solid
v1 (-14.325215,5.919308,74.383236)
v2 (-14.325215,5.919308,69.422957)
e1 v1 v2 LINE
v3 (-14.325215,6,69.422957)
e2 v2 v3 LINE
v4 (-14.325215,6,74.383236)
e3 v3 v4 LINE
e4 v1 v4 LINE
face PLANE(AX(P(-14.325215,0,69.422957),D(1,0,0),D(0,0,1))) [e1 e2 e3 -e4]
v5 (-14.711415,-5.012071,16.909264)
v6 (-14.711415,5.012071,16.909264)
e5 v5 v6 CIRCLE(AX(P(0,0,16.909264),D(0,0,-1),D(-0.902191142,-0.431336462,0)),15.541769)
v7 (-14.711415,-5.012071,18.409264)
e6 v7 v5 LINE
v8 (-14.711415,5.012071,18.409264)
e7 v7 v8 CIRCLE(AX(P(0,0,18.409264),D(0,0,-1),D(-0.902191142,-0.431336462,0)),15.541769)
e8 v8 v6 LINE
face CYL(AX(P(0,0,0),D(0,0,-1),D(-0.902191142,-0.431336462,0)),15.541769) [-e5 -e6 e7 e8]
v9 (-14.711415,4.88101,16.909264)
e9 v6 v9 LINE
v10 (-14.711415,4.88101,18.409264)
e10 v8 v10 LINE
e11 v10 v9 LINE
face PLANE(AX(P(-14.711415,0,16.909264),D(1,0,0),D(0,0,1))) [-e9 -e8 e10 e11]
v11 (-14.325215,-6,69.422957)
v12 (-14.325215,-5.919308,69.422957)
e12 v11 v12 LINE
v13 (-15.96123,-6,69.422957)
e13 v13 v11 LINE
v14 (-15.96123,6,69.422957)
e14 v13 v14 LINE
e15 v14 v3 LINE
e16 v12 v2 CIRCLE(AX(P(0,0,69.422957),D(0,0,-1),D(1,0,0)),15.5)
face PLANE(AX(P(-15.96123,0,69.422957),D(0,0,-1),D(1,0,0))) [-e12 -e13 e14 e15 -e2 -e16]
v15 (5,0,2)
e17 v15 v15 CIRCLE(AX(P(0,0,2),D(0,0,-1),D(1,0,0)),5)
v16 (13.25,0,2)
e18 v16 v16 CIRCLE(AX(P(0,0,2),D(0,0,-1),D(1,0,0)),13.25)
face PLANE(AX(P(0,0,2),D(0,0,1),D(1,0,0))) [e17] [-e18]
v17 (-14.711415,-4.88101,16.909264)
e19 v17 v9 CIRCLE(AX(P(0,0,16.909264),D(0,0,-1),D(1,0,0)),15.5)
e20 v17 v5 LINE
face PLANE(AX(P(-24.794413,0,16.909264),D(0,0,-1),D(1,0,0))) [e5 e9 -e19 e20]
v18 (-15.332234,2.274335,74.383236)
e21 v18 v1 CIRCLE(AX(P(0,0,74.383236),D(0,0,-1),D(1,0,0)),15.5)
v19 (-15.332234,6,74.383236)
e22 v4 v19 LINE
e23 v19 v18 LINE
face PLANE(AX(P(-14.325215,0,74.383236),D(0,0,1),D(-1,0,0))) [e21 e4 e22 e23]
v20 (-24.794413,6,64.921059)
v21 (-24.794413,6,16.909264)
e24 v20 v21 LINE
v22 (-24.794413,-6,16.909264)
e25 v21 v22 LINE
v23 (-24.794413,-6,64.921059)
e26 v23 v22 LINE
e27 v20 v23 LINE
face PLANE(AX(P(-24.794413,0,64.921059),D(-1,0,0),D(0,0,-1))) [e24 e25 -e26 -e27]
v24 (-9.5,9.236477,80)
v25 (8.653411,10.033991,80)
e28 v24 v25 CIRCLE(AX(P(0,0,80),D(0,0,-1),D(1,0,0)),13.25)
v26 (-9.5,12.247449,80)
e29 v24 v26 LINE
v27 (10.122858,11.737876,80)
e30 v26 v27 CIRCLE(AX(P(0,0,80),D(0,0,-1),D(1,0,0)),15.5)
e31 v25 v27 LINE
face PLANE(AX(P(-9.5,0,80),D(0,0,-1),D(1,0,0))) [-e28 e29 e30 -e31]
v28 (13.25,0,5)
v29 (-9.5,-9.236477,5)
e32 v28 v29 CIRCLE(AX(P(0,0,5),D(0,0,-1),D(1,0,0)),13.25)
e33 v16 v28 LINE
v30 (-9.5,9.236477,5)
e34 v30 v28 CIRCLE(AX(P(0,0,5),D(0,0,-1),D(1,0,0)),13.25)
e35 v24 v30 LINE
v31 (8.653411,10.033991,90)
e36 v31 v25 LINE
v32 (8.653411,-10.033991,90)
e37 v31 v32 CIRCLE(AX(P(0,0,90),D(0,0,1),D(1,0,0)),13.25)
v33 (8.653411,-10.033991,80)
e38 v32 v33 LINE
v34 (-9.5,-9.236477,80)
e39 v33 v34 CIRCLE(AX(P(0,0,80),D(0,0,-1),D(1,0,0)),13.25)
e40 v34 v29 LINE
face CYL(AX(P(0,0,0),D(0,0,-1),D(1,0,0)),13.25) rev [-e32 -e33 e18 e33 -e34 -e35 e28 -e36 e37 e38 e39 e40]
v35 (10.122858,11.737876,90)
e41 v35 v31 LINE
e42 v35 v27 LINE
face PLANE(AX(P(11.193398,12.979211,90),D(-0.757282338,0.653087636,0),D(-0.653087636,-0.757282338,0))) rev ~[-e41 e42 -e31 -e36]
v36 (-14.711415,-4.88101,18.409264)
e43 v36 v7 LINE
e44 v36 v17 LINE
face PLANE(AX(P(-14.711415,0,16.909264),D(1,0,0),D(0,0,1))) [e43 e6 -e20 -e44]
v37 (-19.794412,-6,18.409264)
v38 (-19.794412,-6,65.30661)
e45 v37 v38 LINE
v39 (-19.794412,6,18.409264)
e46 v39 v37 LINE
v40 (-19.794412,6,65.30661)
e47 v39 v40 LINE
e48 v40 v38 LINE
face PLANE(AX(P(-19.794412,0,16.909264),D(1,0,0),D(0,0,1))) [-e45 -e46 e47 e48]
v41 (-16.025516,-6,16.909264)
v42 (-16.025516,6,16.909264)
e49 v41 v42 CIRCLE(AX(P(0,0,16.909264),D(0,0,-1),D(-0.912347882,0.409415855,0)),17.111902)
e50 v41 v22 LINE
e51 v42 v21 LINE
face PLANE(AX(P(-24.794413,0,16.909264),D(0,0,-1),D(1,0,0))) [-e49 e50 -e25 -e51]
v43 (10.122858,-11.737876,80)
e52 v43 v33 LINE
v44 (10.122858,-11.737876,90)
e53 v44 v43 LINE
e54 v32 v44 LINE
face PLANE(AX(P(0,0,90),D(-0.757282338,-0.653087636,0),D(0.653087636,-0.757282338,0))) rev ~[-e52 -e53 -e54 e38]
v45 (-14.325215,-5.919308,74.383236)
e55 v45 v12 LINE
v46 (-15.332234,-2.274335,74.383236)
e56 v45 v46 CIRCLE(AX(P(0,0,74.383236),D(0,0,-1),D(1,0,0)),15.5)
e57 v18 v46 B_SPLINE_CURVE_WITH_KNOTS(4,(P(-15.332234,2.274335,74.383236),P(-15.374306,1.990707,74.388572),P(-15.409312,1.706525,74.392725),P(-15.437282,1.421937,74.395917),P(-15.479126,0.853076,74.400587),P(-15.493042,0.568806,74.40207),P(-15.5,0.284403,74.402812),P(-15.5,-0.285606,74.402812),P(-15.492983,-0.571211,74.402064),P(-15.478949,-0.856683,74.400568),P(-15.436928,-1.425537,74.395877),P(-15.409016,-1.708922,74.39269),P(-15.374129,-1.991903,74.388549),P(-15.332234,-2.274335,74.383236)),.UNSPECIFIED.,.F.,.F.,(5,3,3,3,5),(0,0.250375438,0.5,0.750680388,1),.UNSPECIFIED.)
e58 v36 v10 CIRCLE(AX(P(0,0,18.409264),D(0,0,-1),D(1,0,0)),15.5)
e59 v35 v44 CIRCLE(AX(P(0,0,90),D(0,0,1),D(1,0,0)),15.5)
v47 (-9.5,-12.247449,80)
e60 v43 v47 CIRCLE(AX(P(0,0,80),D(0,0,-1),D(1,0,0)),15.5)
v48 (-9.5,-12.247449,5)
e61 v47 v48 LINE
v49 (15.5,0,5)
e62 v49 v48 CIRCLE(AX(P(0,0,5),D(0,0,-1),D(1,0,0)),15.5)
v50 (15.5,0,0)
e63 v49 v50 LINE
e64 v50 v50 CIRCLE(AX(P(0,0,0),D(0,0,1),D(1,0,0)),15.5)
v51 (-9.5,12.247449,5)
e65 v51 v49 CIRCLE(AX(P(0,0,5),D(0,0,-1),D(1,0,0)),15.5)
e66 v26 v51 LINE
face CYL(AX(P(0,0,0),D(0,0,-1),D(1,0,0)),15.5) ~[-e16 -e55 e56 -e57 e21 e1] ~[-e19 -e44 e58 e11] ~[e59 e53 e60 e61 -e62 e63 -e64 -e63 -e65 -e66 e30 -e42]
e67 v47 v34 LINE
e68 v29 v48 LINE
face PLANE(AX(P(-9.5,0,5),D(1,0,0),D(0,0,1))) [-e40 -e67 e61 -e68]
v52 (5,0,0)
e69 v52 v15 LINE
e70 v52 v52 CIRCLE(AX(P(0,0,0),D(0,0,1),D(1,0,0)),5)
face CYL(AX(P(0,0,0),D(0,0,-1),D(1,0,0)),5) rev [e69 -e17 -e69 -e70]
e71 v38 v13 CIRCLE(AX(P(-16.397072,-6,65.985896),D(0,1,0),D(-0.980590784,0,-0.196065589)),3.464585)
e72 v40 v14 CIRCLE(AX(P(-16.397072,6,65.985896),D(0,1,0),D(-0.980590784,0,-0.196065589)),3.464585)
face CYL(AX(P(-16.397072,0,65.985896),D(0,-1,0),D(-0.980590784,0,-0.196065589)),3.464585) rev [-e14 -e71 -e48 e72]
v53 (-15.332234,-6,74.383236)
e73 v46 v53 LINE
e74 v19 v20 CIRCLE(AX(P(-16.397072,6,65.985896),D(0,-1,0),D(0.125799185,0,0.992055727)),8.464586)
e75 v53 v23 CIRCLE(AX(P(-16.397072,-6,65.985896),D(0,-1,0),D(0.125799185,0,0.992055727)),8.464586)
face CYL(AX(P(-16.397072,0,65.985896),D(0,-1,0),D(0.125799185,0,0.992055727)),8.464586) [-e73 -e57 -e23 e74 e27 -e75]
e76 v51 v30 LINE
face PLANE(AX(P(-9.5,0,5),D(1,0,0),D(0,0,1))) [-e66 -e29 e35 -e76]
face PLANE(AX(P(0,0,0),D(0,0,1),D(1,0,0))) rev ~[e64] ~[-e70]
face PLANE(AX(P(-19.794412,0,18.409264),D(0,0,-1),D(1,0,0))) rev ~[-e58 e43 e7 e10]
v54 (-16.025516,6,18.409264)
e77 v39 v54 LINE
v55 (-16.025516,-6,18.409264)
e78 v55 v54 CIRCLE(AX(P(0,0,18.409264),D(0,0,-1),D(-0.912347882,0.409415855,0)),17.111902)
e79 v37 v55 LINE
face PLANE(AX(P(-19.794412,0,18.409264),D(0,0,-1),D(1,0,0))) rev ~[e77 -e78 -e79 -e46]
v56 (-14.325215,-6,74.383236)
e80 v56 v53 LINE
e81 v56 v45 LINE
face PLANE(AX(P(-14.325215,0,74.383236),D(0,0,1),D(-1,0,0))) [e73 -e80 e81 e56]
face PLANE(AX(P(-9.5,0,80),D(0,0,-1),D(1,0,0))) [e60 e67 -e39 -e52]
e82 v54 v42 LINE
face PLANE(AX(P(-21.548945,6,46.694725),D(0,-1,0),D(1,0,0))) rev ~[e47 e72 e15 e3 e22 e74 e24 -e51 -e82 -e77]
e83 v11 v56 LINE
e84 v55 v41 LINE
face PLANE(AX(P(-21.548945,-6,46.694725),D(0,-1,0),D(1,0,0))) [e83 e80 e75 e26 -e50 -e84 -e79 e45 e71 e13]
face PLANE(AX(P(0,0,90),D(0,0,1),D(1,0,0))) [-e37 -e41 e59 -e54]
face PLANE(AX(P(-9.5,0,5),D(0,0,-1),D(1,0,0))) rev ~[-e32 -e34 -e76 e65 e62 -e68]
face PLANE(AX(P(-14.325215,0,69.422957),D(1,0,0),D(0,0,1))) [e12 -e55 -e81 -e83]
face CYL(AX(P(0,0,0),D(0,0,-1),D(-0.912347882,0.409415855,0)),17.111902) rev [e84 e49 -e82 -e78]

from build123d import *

# Parameters (mm, degrees)
F0_R      = 15.5
F0_R_2    = 13.25
F1_DEPTH  = 90
F2_R      = 15.5
F3_DEPTH  = 2
F4_R      = 5
F5_DEPTH  = 90.001
F6_W      = 25
F6_H      = 75
F7_DEPTH  = 30
F9_DEPTH  = 6
F10_W     = 5.0829965621
F10_H     = 1.5
F11_DEPTH = 6
F13_DEPTH = 25
F15_DEPTH = 25
F16_DEPTH = 25


# Not quite as in the source:
# - a feature names something its author has since deleted; it is built from what else it names


with BuildPart() as f1:
    # F0 (on Top) → F1 (new body)
    with BuildSketch(Plane.XY):
        Circle(F0_R)
        Circle(F0_R_2, mode=Mode.SUBTRACT)
    extrude(amount=F1_DEPTH)

    # F2 (on Top) → F3 (join)
    with BuildSketch(Plane.XY):
        Circle(F2_R)
    extrude(amount=F3_DEPTH)

    # F4 (on Top) → F5 (cut, through all)
    with BuildSketch(Plane.XY):
        Circle(F4_R)
    extrude(amount=F5_DEPTH, mode=Mode.SUBTRACT)

    # F6 (on Front) → F7 (cut, symmetric)
    with BuildSketch(Plane.XZ):
        with Locations((3, 42.5)):
            Rectangle(F6_W, F6_H)
    extrude(amount=F7_DEPTH, both=True, mode=Mode.SUBTRACT)

    # F8 (on Front) → F9 (join, symmetric)
    with BuildSketch(Plane.XZ):
        with BuildLine():
            Line((-14.3252154812, 74.3832364678), (-15.3322340921, 74.3832364678))
            ThreePointArc((-15.3322340921, 74.3832364678), (-22.3824376382, 71.9712620232), (-24.7944127768, 64.9210587144))
            Line((-24.7944127768, 64.9210587144), (-24.7944127768, 16.9092640281))
            Line((-24.7944127768, 16.9092640281), (-19.7944119573, 16.9092640281))
            Line((-19.7944119573, 16.9092640281), (-19.7944119573, 65.3066100025))
            ThreePointArc((-19.7944119573, 65.3066100025), (-18.9325593375, 68.3469659349), (-15.9612301203, 69.4229570209))
            Line((-15.9612301203, 69.4229570209), (-14.3252154812, 69.4229570209))
            Line((-14.3252154812, 69.4229570209), (-14.3252154812, 74.3832364678))
        make_face()
    extrude(amount=F9_DEPTH, both=True)

    # F10 (on Front) → F11 (join, symmetric)
    with BuildSketch(Plane.XZ):
        with BuildLine():
            Line((-14.3252154812, 74.3832364678), (-15.3322340921, 74.3832364678))
            ThreePointArc((-15.3322340921, 74.3832364678), (-22.3824376382, 71.9712620232), (-24.7944127768, 64.9210587144))
            Line((-24.7944127768, 64.9210587144), (-24.7944127768, 16.9092640281))
            Line((-24.7944127768, 16.9092640281), (-19.7944119573, 16.9092640281))
            Line((-19.7944119573, 16.9092640281), (-19.7944119573, 18.4092640281))
            Line((-19.7944119573, 18.4092640281), (-19.7944119573, 65.3066100025))
            ThreePointArc((-19.7944119573, 65.3066100025), (-18.9325593375, 68.3469659349), (-15.9612301203, 69.4229570209))
            Line((-15.9612301203, 69.4229570209), (-14.3252154812, 69.4229570209))
            Line((-14.3252154812, 69.4229570209), (-14.3252154812, 74.3832364678))
        make_face()
        with Locations((-17.2529136762, 17.6592640281)):
            Rectangle(F10_W, F10_H)
    extrude(amount=F11_DEPTH, both=True)

    # F12 (on Top) → F13 (cut)
    with BuildSketch(Plane.XY):
        with BuildLine():
            Line((-13.8731463173, 7.0058838464), (-15.6120072238, 7.0058838464))
            ThreePointArc((-15.6120072238, 7.0058838464), (-17.1111072391, 0.1648850375), (-15.74411501, -6.7037318396))
            Line((-15.74411501, -6.7037318396), (-14.0216467162, -6.7037318396))
            ThreePointArc((-14.0216467162, -6.7037318396), (-15.5408577678, 0.1683361248), (-13.8731463173, 7.0058838464))
        make_face()
    extrude(amount=F13_DEPTH, mode=Mode.SUBTRACT)

    # F14 (on face) → F15 (cut)
    with BuildSketch(Plane.XY.offset(90)):
        with BuildLine():
            Line((11.193397513, 12.9792110231), (0, 0))
            Line((0, 0), (11.193397513, -12.9792110231))
            ThreePointArc((11.193397513, -12.9792110231), (17.1391967918, 0), (11.193397513, 12.9792110231))
        make_face()
    extrude(amount=-F15_DEPTH, mode=Mode.SUBTRACT)

    # F14 (on face) → F16 (cut)
    with BuildSketch(Plane.XY.offset(90)):
        with BuildLine():
            Line((10.1228583556, 11.7378762437), (8.6534111749, 10.0339909826))
            ThreePointArc((8.6534111749, 10.0339909826), (12.0461653249, 5.5183694119), (13.25, 0))
            ThreePointArc((13.25, 0), (12.0461653249, -5.5183694119), (8.6534111749, -10.0339909826))
            Line((8.6534111749, -10.0339909826), (10.1228583556, -11.7378762437))
            ThreePointArc((10.1228583556, -11.7378762437), (14.0917405687, -6.4554510102), (15.5, 0))
            ThreePointArc((15.5, 0), (14.0917405687, 6.4554510102), (10.1228583556, 11.7378762437))
        make_face()
        with BuildLine():
            Line((11.193397513, 12.9792110231), (10.1228583556, 11.7378762437))
            ThreePointArc((10.1228583556, 11.7378762437), (14.0917405687, 6.4554510102), (15.5, 0))
            ThreePointArc((15.5, 0), (14.0917405687, -6.4554510102), (10.1228583556, -11.7378762437))
            Line((10.1228583556, -11.7378762437), (11.193397513, -12.9792110231))
            ThreePointArc((11.193397513, -12.9792110231), (17.1391967918, 0), (11.193397513, 12.9792110231))
        make_face()
        with BuildLine():
            Line((8.6534111749, 10.0339909826), (0, 0))
            Line((0, 0), (8.6534111749, -10.0339909826))
            ThreePointArc((8.6534111749, -10.0339909826), (12.0461653249, -5.5183694119), (13.25, 0))
            ThreePointArc((13.25, 0), (12.0461653249, 5.5183694119), (8.6534111749, 10.0339909826))
        make_face()
    extrude(amount=-F16_DEPTH, mode=Mode.SUBTRACT)


solid = f1.part
